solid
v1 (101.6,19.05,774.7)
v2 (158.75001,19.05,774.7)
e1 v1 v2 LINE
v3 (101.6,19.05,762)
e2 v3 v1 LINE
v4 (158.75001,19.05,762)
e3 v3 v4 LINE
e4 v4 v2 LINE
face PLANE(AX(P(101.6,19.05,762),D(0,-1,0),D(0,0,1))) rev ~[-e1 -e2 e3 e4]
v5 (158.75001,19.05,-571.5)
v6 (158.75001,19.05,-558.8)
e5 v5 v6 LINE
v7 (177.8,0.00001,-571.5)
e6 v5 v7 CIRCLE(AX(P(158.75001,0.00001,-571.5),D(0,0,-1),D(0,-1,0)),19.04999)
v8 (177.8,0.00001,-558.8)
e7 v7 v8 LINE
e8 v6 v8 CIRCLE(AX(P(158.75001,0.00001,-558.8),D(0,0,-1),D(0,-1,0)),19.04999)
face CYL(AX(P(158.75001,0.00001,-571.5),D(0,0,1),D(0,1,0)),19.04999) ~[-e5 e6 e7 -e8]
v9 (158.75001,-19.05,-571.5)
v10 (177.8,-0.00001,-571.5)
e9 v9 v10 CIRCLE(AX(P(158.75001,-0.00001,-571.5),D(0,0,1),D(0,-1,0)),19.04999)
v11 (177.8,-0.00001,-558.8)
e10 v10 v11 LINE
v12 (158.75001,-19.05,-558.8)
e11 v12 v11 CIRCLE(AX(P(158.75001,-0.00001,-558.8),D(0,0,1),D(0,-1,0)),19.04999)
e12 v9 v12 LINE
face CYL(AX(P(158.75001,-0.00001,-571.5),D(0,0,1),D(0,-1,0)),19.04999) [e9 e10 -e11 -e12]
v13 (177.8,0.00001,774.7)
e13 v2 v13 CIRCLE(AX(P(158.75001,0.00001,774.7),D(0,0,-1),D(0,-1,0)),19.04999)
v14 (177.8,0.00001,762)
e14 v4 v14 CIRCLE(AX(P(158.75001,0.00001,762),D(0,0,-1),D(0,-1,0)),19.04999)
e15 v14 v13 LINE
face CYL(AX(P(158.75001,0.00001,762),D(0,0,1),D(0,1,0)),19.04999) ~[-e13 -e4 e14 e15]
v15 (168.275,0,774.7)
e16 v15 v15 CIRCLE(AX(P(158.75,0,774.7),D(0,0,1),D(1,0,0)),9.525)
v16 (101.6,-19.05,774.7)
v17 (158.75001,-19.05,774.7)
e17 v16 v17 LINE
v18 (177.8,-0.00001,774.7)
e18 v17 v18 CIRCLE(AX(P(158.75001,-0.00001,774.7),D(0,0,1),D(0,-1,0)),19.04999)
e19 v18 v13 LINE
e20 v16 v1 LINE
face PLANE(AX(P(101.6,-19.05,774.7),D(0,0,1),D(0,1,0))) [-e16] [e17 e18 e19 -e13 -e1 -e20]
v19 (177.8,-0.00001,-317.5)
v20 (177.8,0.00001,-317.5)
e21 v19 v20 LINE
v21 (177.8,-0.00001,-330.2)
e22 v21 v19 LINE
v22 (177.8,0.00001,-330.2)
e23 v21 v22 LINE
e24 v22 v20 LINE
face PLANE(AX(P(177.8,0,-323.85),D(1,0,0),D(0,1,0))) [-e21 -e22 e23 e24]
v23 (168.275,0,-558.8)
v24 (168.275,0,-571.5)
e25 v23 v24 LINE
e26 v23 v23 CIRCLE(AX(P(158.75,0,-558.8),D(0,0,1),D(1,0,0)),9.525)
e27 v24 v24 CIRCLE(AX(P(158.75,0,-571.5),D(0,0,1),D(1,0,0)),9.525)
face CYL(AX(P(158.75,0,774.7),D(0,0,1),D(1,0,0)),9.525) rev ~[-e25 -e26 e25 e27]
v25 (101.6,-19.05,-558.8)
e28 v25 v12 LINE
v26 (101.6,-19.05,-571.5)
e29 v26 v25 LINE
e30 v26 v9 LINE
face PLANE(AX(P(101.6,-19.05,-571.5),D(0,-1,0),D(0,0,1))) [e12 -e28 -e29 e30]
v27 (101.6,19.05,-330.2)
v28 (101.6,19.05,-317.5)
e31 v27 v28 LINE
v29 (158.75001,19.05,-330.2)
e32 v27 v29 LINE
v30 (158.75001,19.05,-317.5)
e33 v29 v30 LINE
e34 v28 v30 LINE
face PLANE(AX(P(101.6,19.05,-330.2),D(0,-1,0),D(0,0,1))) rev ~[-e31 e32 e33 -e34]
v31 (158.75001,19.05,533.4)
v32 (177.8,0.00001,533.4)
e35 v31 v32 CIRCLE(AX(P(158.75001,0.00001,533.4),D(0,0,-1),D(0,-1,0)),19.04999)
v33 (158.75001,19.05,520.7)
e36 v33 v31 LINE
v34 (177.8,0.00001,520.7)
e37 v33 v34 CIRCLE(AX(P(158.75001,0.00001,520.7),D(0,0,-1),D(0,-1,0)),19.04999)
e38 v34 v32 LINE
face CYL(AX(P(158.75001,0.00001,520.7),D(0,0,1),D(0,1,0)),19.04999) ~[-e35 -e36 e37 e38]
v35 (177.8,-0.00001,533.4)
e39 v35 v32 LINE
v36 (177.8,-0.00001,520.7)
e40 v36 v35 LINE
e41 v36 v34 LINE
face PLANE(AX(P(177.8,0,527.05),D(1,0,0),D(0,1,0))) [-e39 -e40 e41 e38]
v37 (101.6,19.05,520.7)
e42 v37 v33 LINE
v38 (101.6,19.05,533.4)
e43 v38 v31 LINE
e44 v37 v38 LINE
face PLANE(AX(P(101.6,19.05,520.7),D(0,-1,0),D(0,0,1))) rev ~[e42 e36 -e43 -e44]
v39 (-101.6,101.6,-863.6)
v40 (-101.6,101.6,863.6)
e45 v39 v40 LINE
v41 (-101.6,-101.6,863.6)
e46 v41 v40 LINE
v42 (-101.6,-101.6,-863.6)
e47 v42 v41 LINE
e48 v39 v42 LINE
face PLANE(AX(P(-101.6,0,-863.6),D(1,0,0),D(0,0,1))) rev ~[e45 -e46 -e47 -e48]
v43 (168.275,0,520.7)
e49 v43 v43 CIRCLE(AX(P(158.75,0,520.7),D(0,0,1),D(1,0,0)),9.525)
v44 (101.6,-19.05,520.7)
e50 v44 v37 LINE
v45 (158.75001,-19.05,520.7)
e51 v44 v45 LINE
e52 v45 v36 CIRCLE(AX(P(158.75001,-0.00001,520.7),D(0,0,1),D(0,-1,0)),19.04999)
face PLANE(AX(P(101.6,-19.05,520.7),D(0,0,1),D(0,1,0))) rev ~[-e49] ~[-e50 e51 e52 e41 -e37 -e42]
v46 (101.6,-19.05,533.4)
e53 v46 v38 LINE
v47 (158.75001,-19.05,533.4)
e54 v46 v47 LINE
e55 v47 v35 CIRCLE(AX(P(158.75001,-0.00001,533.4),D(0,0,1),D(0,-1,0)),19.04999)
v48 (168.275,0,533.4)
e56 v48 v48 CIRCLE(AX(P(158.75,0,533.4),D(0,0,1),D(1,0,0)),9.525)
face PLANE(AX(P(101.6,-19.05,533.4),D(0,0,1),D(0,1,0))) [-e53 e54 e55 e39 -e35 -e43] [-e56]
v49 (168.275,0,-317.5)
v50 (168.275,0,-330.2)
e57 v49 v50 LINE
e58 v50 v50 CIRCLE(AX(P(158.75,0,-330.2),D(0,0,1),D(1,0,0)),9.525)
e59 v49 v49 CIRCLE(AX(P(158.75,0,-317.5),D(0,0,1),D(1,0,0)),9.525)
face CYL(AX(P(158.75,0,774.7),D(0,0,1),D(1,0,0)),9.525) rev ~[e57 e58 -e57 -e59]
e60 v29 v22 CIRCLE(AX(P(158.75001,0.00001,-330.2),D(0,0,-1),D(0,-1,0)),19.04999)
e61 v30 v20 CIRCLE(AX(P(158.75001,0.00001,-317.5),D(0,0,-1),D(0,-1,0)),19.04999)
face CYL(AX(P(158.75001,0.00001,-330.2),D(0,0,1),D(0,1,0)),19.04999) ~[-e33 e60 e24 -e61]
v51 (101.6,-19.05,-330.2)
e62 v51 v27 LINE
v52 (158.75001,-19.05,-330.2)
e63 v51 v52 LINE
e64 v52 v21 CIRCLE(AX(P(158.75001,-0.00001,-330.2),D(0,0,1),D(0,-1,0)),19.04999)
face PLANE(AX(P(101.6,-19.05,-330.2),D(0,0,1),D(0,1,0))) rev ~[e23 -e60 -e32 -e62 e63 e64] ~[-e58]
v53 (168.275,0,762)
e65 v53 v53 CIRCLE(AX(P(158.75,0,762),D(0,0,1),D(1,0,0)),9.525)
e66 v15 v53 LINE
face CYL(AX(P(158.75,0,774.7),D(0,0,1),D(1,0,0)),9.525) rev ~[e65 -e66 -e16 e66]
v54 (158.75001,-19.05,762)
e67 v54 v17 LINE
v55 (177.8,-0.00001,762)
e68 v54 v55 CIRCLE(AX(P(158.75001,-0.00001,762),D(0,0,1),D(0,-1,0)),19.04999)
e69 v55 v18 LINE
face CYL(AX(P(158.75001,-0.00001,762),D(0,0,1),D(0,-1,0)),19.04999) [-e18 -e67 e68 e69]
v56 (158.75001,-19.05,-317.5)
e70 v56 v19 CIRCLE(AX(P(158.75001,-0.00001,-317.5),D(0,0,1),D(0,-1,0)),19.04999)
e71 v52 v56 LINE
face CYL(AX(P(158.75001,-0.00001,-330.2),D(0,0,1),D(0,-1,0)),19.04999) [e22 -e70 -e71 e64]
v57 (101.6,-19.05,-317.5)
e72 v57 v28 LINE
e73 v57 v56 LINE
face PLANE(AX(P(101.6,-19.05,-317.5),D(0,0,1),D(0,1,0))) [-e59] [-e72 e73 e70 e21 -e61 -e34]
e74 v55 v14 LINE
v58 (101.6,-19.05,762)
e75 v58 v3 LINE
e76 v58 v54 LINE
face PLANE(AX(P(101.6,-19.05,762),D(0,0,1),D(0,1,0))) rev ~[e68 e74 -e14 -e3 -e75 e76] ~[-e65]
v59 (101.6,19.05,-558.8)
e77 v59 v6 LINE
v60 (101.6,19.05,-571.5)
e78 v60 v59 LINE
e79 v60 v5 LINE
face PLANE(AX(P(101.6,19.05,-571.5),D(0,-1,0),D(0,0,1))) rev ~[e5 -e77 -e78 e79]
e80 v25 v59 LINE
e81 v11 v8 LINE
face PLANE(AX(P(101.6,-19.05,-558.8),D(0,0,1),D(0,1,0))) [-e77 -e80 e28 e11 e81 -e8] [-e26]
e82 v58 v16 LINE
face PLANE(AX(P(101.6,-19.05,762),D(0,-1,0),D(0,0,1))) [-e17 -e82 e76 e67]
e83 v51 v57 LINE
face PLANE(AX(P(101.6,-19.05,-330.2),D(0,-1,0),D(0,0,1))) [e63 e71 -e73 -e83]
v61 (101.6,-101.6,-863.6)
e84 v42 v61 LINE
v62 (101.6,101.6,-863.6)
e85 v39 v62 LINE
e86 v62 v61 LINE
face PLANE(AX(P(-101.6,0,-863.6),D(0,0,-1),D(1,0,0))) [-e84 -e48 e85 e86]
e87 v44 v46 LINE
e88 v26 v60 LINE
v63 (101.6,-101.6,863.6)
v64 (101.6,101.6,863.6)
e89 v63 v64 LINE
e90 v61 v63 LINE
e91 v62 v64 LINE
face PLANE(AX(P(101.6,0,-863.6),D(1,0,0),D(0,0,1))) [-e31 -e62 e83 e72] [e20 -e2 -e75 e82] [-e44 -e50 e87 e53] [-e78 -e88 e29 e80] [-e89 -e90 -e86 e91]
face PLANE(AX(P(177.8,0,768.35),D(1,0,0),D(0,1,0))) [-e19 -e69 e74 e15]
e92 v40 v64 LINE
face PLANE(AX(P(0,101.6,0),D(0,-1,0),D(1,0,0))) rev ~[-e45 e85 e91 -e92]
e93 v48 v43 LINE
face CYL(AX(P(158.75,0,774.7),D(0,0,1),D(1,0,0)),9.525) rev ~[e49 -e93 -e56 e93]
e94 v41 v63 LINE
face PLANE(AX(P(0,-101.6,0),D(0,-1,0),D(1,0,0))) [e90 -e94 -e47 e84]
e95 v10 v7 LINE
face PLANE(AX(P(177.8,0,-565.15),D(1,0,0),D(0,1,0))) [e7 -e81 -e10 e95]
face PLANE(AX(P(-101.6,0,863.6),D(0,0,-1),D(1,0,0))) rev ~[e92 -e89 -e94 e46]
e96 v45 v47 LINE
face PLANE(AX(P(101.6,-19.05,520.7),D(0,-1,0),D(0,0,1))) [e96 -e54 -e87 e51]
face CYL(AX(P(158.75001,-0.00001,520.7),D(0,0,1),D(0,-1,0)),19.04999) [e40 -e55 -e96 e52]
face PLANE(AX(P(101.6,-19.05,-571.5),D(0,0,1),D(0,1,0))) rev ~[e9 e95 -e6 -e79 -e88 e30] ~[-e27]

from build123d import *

# Parameters (mm, degrees)
F0_W     = 203.2
F0_H     = 1727.2
F1_DEPTH = 101.6
F2_W     = 38.1
F2_H     = 12.7
F3_DEPTH = 76.2
F4_R     = 19.04999
F5_R     = 9.525
F6_DEPTH = 1638.301


# Not quite as in the source:
# - a fillet or chamfer is up to 0.001 mm smaller than in the source, because OpenCascade refuses the exact size


with BuildPart() as f1:
    # F0 (on Front) → F1 (new body, symmetric)
    with BuildSketch(Plane.XZ):
        Rectangle(F0_W, F0_H)
    extrude(amount=F1_DEPTH, both=True)

    # F2 (on face) → F3 (join)
    with BuildSketch(Plane.YZ.offset(101.6)):
        with Locations((0, -565.15)):
            Rectangle(F2_W, F2_H)
        with Locations((0, -323.85)):
            Rectangle(F2_W, F2_H)
        with Locations((0, 527.05)):
            Rectangle(F2_W, F2_H)
        with Locations((0, 768.35)):
            Rectangle(F2_W, F2_H)
    extrude(amount=F3_DEPTH)

    # F4 (radius 19.05 in the source; OpenCascade refuses exactly that, so slightly less here)
    f4_edges = [f1.edges().sort_by_distance(p)[0] for p in [
        (177.8, 19.05, -565.15),
        (177.8, -19.05, -565.15),
        (177.8, 19.05, -323.85),
        (177.8, -19.05, -323.85),
        (177.8, 19.05, 527.05),
        (177.8, -19.05, 527.05),
        (177.8, 19.05, 768.35),
        (177.8, -19.05, 768.35),
    ]]
    fillet(f4_edges, radius=F4_R)

    # F5 (on face) → F6 (cut, through all)
    with BuildSketch(Plane.XY.offset(774.7)):
        with Locations((158.75, 0)):
            Circle(F5_R)
    extrude(amount=-F6_DEPTH, mode=Mode.SUBTRACT)


solid = f1.part
